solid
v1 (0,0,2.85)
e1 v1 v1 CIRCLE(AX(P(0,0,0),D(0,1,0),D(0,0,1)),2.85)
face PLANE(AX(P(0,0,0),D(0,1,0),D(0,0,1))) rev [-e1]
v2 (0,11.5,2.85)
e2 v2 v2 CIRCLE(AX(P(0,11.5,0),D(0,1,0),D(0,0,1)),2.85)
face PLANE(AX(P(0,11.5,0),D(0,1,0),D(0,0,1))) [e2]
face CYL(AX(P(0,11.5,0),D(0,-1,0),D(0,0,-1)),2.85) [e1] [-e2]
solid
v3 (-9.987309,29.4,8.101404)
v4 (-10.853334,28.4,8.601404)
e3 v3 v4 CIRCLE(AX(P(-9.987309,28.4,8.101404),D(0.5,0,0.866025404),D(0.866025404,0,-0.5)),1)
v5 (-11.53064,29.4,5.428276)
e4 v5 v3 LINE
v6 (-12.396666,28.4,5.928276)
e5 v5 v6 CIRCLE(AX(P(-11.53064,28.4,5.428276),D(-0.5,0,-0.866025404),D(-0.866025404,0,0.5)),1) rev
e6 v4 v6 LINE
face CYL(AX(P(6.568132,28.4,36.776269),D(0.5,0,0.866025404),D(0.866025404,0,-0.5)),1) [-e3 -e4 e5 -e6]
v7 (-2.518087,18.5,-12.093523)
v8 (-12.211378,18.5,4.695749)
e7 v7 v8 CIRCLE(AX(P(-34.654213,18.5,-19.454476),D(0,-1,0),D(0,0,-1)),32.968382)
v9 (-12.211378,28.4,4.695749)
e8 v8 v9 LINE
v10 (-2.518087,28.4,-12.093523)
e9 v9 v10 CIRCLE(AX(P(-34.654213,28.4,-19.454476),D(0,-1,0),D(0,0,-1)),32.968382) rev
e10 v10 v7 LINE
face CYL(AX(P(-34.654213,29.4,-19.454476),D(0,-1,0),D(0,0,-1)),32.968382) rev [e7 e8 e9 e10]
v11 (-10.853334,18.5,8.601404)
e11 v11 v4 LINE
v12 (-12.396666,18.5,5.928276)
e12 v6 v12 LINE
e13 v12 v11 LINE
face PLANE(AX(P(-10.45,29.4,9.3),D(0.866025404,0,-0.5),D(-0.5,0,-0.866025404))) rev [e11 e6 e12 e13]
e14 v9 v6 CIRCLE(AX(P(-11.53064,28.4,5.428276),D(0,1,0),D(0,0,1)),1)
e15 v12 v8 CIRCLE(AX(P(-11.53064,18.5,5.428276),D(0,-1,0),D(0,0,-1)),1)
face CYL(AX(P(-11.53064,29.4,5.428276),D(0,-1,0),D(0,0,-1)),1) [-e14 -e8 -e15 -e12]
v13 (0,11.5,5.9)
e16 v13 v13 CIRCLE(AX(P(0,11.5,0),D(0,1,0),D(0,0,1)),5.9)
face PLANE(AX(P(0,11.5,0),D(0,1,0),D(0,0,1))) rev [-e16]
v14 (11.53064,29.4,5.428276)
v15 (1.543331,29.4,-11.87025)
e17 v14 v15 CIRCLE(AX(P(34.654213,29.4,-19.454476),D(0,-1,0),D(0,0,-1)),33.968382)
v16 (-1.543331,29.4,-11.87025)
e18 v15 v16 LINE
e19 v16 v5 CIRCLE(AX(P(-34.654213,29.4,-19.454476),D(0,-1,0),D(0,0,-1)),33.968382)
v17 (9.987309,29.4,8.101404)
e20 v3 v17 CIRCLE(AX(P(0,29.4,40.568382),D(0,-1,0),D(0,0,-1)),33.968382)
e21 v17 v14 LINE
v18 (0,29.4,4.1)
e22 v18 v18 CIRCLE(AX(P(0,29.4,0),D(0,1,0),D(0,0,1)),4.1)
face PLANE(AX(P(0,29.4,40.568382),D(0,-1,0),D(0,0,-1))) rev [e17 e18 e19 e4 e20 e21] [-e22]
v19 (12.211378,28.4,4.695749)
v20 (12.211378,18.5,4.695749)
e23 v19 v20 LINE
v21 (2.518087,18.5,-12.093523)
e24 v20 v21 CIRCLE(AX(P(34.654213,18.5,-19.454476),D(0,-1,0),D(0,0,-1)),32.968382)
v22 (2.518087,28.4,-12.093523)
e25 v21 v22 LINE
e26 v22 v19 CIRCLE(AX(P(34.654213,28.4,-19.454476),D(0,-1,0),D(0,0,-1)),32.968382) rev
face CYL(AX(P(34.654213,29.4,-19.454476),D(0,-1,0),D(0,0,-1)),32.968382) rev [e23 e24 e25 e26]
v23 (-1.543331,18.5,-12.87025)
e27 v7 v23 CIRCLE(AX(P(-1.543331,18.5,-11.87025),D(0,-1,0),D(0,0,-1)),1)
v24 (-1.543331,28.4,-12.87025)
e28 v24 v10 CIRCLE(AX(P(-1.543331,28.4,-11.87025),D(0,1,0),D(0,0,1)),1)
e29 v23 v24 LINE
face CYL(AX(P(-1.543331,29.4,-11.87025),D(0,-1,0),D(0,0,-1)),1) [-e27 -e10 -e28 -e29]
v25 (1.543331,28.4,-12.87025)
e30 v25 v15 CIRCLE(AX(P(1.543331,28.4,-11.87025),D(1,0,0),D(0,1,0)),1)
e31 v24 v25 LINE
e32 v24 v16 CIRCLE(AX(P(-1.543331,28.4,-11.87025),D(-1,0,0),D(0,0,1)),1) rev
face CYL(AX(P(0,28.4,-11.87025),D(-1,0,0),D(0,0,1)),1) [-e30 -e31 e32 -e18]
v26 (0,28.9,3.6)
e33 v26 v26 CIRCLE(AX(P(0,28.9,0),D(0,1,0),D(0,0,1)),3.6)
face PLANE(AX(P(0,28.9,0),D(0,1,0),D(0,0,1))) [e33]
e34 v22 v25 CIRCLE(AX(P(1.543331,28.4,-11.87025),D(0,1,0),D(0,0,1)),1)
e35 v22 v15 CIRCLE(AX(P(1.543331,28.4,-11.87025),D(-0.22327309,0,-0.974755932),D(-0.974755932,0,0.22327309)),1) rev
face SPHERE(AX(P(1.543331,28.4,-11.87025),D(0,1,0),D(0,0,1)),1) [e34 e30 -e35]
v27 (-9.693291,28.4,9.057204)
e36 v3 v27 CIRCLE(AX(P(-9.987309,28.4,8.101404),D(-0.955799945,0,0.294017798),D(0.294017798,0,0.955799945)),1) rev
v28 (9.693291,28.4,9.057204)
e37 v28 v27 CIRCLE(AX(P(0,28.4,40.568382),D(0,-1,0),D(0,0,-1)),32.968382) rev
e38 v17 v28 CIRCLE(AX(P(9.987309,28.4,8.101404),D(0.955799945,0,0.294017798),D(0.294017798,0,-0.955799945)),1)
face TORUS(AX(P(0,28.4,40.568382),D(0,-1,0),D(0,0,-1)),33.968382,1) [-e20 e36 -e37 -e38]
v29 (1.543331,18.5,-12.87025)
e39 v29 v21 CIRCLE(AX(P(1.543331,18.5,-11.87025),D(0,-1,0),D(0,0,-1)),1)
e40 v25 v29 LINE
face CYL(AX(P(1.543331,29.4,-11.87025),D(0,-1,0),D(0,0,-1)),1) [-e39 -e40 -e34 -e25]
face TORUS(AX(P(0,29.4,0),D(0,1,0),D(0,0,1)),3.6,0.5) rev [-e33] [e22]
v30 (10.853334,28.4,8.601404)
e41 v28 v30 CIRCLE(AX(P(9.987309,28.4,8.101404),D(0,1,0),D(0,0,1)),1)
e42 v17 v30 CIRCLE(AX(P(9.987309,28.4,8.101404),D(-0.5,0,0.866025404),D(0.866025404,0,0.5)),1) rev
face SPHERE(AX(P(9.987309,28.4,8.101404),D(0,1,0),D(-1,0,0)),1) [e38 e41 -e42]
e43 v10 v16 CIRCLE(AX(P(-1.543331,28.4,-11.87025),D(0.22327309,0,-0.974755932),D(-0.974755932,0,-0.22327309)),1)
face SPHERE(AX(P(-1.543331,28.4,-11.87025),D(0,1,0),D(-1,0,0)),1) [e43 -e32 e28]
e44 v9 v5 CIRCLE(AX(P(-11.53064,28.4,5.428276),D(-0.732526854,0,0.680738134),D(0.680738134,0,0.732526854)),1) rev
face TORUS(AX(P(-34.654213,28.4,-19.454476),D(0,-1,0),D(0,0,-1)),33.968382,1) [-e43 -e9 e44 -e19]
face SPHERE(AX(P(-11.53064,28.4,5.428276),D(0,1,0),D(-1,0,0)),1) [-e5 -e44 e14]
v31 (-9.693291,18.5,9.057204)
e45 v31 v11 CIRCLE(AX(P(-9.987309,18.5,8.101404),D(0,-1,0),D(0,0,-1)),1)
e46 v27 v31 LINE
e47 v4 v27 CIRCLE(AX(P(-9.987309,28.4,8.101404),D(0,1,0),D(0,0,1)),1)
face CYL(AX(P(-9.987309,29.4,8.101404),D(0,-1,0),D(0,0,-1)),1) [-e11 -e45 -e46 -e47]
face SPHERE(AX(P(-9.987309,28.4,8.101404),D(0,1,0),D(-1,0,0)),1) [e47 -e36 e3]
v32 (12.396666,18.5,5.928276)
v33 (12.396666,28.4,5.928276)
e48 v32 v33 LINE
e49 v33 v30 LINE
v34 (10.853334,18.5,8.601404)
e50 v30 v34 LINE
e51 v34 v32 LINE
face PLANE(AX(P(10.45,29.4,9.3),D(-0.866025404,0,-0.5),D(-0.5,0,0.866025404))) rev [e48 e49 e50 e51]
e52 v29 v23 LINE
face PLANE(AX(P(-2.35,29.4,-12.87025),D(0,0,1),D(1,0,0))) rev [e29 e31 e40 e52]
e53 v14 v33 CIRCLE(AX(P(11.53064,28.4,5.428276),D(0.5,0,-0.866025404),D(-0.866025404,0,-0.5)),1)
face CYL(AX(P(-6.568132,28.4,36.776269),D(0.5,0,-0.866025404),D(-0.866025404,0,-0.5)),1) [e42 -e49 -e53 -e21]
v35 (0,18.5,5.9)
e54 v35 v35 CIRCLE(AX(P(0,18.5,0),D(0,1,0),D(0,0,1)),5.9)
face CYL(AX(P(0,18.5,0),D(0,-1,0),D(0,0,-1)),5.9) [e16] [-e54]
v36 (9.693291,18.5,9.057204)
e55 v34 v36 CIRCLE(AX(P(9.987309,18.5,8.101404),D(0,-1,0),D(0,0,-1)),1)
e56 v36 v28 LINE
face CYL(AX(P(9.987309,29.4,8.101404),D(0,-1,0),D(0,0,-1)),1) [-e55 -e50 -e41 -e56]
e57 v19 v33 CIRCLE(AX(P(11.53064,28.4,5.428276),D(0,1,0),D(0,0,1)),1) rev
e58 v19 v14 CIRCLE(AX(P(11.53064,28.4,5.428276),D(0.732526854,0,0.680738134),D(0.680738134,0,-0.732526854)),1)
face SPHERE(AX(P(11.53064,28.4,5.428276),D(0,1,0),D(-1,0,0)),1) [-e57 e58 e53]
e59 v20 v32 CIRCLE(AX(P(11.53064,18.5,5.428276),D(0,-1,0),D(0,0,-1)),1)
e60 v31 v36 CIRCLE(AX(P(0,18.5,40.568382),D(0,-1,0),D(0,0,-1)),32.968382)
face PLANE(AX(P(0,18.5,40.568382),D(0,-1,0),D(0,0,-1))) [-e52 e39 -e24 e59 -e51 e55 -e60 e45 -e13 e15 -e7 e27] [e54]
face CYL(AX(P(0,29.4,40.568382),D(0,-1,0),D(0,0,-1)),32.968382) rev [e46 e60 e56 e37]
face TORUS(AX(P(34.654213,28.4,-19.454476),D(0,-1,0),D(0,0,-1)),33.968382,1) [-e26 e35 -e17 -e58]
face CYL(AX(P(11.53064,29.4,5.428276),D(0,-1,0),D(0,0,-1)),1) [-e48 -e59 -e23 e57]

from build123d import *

# Parameters (mm, degrees)
SKETCH1_R           = 2.85
BOSS_EXTRUDE1_DEPTH = 11.5
SKETCH2_R           = 5.9
BOSS_EXTRUDE2_DEPTH = 7
BOSS_EXTRUDE3_DEPTH = 10.9
FILLET1_R           = 1
SKETCH4_R           = 4.1
CUT_EXTRUDE1_DEPTH  = 0.5
FILLET2_R           = 0.5


with BuildPart() as part:
    # Sketch1 → Boss-Extrude1 (new body)
    with BuildSketch(Plane(origin=(0, 0, 0), x_dir=(1, 0, 0), z_dir=(0, 1, 0))):
        with Locations(Location((0, 0, 0), (0, 0, 270))):
            Circle(SKETCH1_R)
    extrude(amount=BOSS_EXTRUDE1_DEPTH)


with BuildPart() as body_2:
    # Sketch2 → Boss-Extrude2 (new body)
    with BuildSketch(Plane(origin=(0, 11.5, 0), x_dir=(1, 0, 0), z_dir=(0, 1, 0))):
        with Locations(Location((0, 0, 0), (0, 0, 270))):
            Circle(SKETCH2_R)
    extrude(amount=BOSS_EXTRUDE2_DEPTH)

    # Sketch3 → Boss-Extrude3 (add)
    with BuildSketch(Plane(origin=(0, 18.5, 0), x_dir=(1, 0, 0), z_dir=(0, 1, 0))):
        with BuildLine():
            Line((10.45, -9.3), (12.8, -5.229680602))
            ThreePointArc((12.8, -5.229680602), (6.102756814, 2.970284867), (2.35, 12.870250337))
            Line((2.35, 12.870250337), (-2.35, 12.870250337))
            ThreePointArc((-2.35, 12.870250337), (-6.102756814, 2.970284867), (-12.8, -5.229680602))
            Line((-12.8, -5.229680602), (-10.45, -9.3))
            ThreePointArc((-10.45, -9.3), (0, -7.6), (10.45, -9.3))
        make_face()
    extrude(amount=BOSS_EXTRUDE3_DEPTH)

    # Fillet1
    fillet1_edges = [body_2.edges().sort_by_distance(p)[0] for p in [
        (-11.625, 29.4, 7.264840301),
        (-10.45, 23.95, 9.3),
        (10.45, 23.95, 9.3),
        (12.8, 23.95, 5.229680602),
        (2.35, 23.95, -12.870250337),
        (-2.35, 23.95, -12.870250337),
        (-12.8, 23.95, 5.229680602),
        (0, 29.4, 7.6),
        (11.625, 29.4, 7.264840301),
        (6.102756814, 29.4, -2.970284867),
        (0, 29.4, -12.870250337),
        (-6.102756814, 29.4, -2.970284867),
    ]]
    fillet(fillet1_edges, radius=FILLET1_R)

    # Sketch4 → Cut-Extrude1 (cut)
    with BuildSketch(Plane(origin=(0, 29.4, 0), x_dir=(1, 0, 0), z_dir=(0, 1, 0))):
        with Locations(Location((0, 0, 0), (0, 0, 270))):
            Circle(SKETCH4_R)
    extrude(amount=-CUT_EXTRUDE1_DEPTH, mode=Mode.SUBTRACT)

    # Fillet2
    fillet2_edges = [body_2.edges().sort_by_distance(p)[0] for p in [
        (0, 28.9, -4.1),
    ]]
    fillet(fillet2_edges, radius=FILLET2_R - 0.0001)  # a hair under: the kernel refuses the full size


solid = Compound([part.part, body_2.part])
